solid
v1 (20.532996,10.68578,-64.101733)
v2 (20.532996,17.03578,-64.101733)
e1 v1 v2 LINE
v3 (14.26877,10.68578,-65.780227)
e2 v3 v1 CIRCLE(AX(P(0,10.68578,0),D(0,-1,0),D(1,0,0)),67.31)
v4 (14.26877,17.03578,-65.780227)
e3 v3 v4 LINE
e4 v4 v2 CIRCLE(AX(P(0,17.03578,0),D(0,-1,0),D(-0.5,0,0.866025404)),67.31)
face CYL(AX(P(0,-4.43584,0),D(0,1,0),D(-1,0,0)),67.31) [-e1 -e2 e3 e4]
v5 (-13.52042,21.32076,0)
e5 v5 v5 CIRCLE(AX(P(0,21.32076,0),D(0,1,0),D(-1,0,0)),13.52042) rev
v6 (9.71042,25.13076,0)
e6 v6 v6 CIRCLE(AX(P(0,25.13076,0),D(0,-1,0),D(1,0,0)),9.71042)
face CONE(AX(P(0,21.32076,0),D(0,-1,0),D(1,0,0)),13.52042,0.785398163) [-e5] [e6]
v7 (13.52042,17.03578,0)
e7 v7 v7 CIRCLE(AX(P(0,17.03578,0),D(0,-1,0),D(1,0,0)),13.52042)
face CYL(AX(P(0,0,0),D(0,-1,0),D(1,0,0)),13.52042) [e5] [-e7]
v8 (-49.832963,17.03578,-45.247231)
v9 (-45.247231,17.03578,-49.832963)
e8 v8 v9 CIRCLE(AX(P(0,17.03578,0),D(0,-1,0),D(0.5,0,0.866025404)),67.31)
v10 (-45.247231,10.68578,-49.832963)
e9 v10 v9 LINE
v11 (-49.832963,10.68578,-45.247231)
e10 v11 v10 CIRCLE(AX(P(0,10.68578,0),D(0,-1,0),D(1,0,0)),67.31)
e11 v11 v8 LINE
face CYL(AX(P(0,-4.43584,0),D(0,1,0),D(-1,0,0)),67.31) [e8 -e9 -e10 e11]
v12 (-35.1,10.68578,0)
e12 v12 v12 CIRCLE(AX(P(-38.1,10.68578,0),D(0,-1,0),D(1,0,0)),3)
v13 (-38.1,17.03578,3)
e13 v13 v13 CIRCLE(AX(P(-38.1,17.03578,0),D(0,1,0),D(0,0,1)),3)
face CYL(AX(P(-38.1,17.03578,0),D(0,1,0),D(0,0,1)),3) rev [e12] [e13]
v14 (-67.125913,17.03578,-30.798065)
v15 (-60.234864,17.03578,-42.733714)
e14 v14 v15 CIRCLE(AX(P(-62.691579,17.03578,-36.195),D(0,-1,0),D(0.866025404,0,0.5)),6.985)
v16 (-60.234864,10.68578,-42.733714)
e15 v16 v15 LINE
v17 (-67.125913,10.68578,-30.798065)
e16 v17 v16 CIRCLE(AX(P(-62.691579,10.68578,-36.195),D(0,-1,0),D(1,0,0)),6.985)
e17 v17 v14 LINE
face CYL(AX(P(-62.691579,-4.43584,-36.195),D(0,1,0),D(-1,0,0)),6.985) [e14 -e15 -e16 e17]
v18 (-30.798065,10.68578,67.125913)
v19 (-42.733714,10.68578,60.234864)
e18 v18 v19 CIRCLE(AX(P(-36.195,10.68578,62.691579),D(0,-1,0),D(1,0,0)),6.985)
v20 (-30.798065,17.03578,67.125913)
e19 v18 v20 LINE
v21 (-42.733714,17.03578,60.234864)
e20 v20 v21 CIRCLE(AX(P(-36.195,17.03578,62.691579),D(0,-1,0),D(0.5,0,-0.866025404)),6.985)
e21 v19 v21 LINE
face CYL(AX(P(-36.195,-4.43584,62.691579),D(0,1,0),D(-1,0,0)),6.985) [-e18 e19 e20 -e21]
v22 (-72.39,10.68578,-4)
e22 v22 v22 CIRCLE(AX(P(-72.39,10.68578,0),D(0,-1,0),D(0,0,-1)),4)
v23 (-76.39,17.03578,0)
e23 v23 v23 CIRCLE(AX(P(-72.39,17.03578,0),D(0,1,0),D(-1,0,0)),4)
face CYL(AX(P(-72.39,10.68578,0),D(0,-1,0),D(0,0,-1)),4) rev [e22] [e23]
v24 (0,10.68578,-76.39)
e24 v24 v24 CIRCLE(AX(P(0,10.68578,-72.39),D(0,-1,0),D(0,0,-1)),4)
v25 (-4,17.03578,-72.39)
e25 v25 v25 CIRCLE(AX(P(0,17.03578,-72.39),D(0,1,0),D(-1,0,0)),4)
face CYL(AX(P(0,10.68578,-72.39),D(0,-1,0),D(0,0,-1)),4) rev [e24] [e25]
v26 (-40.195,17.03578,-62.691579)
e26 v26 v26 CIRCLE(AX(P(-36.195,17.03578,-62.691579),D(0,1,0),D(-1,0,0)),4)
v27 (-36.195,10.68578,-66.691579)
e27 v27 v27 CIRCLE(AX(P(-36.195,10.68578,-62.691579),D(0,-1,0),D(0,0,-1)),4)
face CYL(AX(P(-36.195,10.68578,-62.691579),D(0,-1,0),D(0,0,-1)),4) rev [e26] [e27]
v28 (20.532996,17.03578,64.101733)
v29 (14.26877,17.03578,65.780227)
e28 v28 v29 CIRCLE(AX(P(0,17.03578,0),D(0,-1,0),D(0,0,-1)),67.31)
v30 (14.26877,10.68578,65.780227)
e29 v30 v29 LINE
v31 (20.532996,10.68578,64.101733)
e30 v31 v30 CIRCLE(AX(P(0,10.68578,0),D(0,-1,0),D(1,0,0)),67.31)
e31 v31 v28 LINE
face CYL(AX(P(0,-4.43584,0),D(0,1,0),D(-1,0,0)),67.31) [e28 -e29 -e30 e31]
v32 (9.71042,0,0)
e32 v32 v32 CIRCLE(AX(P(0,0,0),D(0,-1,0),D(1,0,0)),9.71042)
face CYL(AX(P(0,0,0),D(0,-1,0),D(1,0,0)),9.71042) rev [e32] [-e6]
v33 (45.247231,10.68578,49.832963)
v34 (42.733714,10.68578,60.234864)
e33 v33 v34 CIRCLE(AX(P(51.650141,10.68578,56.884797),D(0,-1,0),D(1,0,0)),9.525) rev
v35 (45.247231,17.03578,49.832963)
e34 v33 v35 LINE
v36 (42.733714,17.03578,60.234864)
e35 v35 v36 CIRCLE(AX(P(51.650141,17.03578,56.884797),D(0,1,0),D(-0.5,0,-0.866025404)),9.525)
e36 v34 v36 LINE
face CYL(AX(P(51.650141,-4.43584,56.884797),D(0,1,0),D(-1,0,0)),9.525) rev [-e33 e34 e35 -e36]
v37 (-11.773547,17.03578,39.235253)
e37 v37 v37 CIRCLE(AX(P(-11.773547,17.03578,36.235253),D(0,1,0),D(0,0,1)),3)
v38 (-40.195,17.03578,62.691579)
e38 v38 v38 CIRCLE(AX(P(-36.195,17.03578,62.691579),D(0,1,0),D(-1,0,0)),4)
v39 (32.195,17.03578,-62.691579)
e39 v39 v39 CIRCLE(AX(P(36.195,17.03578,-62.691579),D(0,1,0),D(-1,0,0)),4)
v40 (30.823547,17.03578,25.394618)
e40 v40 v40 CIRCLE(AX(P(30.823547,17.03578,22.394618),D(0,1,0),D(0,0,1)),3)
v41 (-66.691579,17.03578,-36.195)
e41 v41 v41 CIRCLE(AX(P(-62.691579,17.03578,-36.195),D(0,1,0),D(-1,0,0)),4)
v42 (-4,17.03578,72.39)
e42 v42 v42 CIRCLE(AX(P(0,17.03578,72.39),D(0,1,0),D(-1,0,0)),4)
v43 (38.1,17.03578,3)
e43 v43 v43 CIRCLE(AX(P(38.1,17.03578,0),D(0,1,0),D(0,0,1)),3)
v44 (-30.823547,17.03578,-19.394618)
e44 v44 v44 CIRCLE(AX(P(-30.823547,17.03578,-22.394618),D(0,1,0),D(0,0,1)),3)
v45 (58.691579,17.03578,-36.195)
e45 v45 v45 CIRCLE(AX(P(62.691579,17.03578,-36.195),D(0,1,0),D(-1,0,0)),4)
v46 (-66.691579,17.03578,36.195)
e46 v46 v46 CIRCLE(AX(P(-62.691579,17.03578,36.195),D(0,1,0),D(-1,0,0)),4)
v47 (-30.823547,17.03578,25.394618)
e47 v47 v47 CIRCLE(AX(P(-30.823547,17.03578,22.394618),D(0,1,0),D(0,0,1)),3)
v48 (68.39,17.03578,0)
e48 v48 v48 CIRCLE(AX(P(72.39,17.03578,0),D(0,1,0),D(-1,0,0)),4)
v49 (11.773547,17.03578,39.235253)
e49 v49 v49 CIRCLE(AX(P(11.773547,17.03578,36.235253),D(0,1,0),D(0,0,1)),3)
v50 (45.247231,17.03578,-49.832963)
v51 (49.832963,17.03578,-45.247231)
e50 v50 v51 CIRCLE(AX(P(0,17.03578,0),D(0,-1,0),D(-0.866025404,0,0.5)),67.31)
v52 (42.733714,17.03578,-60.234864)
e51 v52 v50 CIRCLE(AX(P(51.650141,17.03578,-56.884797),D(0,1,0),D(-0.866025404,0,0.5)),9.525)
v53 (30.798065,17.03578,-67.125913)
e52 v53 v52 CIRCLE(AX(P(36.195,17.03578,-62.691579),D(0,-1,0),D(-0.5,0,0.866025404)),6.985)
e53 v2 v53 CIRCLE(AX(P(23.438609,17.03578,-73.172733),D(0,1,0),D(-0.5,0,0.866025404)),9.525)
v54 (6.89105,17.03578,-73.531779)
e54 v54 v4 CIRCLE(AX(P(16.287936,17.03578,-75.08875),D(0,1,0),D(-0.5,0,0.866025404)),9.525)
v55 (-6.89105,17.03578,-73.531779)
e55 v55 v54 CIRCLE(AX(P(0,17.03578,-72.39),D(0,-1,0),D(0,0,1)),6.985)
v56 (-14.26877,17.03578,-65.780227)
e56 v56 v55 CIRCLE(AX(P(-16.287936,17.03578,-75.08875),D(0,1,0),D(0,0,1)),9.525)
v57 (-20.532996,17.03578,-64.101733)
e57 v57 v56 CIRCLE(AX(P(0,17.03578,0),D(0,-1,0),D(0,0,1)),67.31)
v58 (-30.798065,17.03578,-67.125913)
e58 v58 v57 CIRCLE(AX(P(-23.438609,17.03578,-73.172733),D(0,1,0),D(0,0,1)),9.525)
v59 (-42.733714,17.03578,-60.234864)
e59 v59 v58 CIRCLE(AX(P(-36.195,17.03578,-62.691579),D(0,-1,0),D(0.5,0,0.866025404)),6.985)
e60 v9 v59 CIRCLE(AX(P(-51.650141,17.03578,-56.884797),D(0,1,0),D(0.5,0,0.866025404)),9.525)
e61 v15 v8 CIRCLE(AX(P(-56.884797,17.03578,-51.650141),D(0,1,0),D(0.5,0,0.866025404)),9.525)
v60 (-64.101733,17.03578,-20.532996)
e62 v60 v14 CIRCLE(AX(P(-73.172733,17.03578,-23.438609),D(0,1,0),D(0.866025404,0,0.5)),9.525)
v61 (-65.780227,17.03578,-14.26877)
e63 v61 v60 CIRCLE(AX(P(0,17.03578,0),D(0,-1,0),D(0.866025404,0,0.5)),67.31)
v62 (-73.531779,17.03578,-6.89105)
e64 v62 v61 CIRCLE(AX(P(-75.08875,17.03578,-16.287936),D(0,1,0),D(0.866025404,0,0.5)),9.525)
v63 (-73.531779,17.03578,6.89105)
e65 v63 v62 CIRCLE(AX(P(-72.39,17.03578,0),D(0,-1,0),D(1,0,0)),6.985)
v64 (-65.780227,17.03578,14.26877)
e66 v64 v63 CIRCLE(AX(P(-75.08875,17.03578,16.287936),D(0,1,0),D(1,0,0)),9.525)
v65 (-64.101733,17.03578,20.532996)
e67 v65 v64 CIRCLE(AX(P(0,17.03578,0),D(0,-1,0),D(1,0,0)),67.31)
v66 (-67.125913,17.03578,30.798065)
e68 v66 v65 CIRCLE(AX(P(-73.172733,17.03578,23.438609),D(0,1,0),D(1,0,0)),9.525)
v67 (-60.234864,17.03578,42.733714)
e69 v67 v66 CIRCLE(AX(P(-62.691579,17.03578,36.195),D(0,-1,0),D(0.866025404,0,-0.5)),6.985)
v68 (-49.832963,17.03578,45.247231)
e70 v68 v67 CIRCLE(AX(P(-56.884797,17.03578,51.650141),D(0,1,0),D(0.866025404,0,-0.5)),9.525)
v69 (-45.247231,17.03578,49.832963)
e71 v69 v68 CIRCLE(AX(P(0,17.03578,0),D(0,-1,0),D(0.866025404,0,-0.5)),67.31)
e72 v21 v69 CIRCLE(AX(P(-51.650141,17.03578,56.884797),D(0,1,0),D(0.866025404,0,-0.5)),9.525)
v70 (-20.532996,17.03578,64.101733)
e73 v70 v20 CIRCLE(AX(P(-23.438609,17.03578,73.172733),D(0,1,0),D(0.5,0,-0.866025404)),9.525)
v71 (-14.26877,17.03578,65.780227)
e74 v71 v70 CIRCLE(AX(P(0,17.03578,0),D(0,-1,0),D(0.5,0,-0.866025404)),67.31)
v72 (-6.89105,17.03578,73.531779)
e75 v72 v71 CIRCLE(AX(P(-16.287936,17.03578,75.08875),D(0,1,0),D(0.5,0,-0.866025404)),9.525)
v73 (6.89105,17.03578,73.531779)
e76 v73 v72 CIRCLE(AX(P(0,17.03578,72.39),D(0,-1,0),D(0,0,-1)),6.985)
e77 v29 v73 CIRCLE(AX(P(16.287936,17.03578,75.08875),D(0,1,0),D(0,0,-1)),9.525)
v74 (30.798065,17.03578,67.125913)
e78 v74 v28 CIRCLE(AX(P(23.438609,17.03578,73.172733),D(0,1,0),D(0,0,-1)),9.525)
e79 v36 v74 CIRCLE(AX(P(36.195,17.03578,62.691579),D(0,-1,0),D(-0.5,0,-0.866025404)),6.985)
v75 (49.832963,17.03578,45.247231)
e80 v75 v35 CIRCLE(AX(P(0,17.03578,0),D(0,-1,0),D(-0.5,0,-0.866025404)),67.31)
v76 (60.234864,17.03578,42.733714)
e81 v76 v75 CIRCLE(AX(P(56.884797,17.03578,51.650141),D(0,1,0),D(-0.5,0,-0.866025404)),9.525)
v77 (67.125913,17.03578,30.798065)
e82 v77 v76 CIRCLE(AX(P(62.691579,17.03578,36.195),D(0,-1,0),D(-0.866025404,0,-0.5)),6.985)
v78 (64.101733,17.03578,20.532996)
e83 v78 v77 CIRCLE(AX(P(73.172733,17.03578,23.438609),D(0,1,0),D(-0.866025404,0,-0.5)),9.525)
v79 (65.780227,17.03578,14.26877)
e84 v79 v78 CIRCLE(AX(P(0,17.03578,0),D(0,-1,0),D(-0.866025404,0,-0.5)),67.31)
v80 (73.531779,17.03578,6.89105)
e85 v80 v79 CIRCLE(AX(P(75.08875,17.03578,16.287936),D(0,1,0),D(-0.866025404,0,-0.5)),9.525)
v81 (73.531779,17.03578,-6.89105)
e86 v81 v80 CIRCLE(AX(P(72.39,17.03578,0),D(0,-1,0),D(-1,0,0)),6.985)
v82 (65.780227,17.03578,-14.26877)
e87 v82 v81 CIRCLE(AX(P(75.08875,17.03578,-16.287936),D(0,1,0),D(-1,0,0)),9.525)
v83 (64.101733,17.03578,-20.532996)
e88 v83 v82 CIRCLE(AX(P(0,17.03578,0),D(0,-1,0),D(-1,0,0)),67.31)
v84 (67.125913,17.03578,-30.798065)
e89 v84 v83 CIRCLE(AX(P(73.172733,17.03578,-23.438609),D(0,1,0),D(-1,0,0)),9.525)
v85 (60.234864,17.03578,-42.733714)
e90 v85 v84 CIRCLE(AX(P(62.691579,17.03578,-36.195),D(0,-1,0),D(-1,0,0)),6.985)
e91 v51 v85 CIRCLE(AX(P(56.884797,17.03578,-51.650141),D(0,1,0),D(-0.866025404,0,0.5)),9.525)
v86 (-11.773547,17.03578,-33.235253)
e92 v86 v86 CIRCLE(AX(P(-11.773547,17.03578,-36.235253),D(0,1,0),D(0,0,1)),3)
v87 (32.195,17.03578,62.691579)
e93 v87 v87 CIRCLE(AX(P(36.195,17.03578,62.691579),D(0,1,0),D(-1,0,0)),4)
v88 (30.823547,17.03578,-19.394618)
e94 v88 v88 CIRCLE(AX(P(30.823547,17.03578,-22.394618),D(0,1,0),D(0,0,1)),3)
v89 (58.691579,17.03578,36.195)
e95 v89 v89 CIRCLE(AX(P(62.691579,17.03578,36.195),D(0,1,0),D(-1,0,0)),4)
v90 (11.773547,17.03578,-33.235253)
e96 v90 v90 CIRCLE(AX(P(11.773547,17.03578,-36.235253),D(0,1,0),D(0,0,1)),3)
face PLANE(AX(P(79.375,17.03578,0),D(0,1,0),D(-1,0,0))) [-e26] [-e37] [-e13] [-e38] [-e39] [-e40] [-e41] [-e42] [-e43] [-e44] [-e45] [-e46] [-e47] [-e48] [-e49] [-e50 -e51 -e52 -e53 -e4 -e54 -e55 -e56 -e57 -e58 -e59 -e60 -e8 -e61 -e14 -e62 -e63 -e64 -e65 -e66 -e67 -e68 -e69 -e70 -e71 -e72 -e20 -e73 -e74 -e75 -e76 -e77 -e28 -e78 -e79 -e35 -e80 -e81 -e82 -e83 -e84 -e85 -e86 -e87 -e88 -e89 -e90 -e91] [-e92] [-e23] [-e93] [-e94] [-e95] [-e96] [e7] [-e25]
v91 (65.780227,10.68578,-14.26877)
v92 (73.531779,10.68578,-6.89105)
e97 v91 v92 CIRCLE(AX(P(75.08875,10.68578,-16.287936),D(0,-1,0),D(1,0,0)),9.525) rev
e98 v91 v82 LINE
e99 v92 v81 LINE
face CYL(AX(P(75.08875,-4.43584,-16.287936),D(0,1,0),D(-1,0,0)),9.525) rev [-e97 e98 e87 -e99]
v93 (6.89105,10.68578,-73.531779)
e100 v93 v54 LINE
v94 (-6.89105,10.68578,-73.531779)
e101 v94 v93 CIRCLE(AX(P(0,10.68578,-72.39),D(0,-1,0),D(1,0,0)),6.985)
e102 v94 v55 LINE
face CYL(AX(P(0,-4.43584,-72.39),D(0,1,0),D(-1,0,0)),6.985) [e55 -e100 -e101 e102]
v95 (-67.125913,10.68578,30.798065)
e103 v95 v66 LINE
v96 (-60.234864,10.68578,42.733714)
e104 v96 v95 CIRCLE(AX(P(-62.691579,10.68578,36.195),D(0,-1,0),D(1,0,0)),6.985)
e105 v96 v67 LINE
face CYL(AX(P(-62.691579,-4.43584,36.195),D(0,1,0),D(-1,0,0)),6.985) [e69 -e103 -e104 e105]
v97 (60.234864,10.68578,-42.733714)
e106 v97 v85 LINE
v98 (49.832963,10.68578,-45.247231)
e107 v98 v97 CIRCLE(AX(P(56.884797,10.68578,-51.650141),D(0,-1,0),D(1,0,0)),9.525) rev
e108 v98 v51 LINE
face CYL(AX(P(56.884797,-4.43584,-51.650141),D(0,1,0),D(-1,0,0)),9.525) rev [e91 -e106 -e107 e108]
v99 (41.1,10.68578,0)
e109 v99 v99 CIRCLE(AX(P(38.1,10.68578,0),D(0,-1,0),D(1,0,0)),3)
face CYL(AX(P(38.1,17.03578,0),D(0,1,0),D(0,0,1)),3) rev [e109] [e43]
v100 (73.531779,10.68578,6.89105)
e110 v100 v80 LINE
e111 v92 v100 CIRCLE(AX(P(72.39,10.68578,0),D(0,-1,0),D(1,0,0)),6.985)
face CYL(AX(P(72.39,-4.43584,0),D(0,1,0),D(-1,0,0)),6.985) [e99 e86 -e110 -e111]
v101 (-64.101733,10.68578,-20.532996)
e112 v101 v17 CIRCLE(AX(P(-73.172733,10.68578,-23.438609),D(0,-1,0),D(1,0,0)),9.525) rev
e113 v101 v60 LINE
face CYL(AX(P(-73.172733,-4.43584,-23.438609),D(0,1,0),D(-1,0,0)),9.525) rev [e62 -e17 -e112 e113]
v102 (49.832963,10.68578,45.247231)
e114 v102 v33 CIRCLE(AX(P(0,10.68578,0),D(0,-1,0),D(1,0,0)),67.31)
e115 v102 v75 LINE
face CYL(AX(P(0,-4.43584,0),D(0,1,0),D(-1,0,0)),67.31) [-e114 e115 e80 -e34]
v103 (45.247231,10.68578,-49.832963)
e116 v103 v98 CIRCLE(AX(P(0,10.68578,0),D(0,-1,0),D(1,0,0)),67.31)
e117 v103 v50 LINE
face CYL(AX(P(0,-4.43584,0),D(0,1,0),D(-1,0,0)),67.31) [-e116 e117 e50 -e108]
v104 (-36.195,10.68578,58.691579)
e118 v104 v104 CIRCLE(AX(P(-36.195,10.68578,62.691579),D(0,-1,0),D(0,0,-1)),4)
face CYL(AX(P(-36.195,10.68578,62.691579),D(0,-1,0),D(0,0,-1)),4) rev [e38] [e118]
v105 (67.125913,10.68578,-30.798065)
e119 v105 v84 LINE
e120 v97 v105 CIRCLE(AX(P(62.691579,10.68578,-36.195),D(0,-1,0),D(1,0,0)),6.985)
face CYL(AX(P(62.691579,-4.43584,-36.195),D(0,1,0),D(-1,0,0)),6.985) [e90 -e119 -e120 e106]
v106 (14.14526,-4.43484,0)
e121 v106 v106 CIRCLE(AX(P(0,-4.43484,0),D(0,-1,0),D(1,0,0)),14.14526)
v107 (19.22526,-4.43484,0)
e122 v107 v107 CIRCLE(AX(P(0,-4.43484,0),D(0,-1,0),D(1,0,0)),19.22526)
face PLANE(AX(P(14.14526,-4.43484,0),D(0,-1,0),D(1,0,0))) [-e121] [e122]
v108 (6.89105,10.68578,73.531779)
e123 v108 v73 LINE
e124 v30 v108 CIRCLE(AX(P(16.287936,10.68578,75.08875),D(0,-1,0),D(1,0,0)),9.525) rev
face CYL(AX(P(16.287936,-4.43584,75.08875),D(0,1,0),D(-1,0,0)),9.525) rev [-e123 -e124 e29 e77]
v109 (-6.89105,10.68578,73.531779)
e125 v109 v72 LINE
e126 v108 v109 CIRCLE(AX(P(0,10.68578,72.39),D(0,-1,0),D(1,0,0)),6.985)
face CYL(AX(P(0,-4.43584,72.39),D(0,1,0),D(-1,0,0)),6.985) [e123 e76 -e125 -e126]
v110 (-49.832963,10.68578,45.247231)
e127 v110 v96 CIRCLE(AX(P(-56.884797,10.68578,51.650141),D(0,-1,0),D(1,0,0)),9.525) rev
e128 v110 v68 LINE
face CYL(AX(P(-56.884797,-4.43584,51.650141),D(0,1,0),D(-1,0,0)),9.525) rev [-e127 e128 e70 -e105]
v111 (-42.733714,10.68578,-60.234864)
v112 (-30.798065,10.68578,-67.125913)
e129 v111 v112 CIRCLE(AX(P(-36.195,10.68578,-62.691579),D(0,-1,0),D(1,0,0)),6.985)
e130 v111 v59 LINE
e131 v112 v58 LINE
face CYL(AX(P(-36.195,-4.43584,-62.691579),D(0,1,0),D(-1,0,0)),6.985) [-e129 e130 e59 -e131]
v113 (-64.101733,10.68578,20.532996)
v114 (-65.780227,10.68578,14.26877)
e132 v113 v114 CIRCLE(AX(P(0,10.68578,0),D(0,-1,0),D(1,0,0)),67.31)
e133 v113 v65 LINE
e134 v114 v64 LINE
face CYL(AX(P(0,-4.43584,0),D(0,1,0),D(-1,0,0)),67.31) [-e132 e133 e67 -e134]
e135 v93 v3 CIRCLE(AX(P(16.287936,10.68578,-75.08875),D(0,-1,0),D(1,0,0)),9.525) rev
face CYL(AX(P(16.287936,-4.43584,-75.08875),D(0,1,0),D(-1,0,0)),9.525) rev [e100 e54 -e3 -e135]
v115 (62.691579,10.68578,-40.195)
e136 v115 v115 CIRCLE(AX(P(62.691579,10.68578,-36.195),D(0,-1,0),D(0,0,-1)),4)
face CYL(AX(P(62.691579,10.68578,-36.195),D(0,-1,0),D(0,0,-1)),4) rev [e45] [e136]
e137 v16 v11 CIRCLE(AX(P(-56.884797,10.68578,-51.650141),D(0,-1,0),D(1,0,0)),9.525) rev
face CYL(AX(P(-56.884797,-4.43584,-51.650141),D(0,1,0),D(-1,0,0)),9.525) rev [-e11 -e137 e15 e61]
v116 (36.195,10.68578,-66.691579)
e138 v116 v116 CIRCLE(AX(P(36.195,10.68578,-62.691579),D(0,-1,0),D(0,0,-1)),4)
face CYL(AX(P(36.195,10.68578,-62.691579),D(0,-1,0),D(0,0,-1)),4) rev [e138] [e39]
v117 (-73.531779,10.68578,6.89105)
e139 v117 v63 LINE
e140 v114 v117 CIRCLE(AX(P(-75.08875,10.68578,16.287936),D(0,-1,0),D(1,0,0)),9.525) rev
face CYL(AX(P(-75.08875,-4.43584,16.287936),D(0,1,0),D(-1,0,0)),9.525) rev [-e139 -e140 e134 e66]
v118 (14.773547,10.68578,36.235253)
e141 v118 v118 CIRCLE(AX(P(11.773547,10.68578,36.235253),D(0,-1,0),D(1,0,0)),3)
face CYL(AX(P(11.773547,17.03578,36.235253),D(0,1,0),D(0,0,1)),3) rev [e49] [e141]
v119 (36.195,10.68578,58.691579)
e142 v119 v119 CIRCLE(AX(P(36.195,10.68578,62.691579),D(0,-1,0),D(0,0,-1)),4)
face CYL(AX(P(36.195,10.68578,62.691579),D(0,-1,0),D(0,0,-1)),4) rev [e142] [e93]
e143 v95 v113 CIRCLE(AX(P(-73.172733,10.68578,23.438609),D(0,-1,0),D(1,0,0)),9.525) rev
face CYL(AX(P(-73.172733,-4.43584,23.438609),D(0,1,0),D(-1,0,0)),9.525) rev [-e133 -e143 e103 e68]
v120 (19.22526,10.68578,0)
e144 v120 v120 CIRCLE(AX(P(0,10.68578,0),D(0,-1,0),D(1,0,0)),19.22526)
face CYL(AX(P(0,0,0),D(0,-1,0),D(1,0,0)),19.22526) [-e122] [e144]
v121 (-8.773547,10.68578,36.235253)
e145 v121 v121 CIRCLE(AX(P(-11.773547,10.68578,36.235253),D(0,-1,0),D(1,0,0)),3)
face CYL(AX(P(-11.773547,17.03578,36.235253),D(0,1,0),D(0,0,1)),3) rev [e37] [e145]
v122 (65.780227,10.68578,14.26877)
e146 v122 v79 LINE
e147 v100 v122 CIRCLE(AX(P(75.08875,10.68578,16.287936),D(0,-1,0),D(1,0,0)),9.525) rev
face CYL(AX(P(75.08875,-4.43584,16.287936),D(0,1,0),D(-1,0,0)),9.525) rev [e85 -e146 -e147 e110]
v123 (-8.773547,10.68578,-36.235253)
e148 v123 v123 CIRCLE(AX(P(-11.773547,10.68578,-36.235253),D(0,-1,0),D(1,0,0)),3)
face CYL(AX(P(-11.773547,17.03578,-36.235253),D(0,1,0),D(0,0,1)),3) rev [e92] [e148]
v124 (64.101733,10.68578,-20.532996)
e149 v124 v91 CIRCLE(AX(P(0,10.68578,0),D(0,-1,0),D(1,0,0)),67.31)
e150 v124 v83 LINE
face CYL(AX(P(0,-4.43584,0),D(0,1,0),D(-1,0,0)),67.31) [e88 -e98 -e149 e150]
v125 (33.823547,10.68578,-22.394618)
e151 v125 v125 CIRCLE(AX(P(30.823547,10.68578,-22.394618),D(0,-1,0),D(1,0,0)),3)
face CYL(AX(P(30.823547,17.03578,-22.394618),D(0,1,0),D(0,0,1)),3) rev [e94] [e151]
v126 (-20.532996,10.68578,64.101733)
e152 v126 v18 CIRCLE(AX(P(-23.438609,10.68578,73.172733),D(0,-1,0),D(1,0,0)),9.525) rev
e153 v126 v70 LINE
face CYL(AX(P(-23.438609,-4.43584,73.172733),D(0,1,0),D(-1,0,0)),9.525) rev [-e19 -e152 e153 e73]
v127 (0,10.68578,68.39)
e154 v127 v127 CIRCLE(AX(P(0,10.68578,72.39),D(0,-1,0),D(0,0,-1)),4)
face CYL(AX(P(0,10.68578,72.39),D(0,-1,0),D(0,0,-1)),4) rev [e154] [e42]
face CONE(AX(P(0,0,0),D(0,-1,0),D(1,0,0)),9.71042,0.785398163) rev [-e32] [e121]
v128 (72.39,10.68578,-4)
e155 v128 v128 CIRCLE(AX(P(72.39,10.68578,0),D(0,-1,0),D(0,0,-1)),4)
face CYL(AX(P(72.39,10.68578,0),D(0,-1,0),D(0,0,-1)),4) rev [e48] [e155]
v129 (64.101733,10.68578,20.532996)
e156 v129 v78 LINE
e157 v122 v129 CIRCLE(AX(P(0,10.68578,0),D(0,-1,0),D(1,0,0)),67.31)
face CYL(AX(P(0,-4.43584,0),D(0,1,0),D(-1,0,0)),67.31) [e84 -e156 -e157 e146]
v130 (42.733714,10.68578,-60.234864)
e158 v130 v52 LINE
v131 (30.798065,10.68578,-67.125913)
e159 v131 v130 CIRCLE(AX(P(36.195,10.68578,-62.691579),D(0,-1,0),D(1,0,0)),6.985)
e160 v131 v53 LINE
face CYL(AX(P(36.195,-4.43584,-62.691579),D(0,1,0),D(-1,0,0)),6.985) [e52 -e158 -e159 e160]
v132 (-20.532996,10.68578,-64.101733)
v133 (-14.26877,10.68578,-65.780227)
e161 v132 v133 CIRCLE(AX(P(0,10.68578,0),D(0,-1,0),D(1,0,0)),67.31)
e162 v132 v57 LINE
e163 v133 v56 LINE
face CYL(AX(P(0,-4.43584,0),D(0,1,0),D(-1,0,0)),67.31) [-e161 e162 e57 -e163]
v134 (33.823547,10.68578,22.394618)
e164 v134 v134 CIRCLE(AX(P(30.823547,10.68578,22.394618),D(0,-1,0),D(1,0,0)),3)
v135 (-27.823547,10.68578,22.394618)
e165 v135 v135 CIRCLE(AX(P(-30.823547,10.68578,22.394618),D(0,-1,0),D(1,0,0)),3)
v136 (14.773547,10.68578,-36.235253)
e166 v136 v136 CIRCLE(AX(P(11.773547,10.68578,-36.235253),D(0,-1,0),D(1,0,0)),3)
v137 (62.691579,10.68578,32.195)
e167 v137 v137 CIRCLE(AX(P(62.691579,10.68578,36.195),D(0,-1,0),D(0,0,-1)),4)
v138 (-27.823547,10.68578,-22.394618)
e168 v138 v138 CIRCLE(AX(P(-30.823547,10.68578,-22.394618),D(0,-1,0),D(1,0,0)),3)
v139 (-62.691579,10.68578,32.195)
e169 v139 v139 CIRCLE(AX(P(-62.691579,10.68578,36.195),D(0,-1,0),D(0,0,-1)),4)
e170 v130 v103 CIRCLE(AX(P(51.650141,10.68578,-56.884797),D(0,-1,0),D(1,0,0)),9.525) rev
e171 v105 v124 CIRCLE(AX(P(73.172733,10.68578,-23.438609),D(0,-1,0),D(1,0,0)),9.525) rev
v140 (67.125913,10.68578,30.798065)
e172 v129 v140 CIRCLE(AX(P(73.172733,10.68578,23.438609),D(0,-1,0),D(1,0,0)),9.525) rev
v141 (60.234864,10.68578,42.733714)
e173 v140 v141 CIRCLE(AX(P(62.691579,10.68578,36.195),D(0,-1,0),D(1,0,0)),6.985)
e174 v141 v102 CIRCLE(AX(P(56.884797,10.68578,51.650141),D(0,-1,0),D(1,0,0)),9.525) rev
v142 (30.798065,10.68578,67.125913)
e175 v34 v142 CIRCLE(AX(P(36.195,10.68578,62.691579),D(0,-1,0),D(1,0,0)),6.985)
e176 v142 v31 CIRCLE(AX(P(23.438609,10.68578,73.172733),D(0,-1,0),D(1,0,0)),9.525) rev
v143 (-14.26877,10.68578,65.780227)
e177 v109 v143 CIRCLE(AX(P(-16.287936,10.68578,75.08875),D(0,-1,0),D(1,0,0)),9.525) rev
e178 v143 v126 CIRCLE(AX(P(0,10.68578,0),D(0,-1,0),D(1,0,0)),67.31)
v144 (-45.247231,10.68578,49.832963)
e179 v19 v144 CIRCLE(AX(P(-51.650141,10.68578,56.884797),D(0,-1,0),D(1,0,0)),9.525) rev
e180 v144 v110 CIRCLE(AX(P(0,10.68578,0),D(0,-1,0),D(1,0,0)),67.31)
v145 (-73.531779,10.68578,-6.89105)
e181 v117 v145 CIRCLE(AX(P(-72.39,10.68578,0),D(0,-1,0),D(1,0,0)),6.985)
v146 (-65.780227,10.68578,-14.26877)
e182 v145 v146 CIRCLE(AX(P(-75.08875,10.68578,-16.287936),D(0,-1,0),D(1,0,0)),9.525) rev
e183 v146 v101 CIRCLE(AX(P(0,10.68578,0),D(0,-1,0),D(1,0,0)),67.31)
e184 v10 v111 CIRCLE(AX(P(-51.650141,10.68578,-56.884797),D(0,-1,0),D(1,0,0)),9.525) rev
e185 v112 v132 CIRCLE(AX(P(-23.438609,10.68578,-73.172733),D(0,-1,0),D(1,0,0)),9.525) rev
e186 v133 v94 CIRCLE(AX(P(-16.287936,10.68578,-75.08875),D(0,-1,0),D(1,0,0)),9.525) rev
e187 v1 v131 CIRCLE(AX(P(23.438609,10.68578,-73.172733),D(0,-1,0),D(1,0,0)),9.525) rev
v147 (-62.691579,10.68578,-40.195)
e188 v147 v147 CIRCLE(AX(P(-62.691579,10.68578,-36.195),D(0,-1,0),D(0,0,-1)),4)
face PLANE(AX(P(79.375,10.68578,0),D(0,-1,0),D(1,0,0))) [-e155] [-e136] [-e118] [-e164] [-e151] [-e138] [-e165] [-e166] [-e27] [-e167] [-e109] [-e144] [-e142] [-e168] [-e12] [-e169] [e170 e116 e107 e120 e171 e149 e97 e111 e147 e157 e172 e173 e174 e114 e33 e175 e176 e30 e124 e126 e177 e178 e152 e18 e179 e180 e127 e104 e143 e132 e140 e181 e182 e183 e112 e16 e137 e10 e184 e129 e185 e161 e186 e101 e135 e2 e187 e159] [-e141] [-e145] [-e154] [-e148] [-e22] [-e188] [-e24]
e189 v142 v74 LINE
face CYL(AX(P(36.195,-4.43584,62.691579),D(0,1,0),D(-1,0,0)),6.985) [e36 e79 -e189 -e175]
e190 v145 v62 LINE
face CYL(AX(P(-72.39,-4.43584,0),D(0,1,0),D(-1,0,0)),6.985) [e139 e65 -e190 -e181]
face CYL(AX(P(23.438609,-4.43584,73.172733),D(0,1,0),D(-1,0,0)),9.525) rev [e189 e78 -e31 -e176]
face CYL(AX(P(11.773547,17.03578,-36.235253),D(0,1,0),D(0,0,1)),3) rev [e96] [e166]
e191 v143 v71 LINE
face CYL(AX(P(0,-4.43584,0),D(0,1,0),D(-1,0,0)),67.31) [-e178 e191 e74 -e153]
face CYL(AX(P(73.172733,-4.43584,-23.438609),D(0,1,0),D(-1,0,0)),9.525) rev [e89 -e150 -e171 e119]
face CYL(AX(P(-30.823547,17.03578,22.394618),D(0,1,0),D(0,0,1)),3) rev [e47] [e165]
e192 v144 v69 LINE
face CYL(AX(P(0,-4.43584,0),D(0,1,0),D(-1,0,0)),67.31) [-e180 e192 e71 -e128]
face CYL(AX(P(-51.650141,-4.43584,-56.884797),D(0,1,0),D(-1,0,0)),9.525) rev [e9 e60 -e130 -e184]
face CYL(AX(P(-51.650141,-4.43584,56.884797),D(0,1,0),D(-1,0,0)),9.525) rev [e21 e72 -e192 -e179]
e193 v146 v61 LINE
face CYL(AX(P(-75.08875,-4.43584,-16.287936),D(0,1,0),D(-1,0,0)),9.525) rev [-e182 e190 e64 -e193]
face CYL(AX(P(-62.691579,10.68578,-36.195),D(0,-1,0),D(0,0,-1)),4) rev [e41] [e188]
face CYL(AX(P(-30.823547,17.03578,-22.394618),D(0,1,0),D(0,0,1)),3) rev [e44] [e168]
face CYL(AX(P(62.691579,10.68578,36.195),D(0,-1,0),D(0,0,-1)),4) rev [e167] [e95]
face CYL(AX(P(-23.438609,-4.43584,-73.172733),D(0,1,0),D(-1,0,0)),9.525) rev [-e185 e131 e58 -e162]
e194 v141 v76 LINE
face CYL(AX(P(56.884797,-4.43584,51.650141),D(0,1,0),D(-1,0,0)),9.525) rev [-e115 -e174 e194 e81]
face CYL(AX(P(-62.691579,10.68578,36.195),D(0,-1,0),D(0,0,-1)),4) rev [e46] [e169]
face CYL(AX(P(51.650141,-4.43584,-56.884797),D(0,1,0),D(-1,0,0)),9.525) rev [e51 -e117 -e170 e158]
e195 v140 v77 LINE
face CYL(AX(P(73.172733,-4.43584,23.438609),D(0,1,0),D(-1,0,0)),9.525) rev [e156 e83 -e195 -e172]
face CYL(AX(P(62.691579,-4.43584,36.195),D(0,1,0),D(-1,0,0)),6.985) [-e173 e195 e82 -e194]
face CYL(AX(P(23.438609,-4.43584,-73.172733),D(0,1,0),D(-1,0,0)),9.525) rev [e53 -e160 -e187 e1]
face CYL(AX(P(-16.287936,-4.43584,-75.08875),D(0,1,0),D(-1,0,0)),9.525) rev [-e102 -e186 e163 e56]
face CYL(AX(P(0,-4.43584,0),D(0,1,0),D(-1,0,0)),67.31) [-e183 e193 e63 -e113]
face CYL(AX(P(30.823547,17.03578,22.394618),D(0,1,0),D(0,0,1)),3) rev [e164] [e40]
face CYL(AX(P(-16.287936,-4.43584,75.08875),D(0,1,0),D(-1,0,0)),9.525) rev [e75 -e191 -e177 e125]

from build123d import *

# Parameters (mm, degrees)
CHAMFER1_SIZE      = 3.81
HOLE2_D            = 6
CIRPATTERN2_COUNT  = 10
HOLE4_D            = 8
CIRPATTERN4_COUNT  = 12
CUT_EXTRUDE3_REACH = 116.288
CIRPATTERN5_COUNT  = 12


with BuildPart() as part:
    # Sketch1 → Revolve1 (revolve)
    with BuildSketch(Plane.XY):
        Polygon((79.375, 10.68578), (79.375, 17.03578), (13.52042, 17.03578), (13.52042, 25.13076), (9.71042, 25.13076), (9.71042, 0), (14.14526, -4.43484), (19.22526, -4.43484), (19.22526, 10.68578), align=None)
    revolve(axis=Axis((0, 0, 0), (0, 1, 0)))

    # Chamfer1
    chamfer1_edges = [part.edges().sort_by_distance(p)[0] for p in [
        (-13.52042, 25.13076, 0),
    ]]
    chamfer(chamfer1_edges, length=CHAMFER1_SIZE - 0.0001)  # a hair under: the kernel refuses the full size

    # Hole2 (through all)
    with Locations(Plane(origin=(0, 17.03578, 0), x_dir=(1, 0, 0), z_dir=(0, 1, 0))):
        with Locations((38.1, 0)):
            hole2 = Hole(HOLE2_D / 2)

    # CirPattern2: Hole2 ×10 about axis
    cirpattern2_axis = Axis((0, 0, 0), (0, 1, 0))
    for i in range(1, CIRPATTERN2_COUNT):
        add(hole2.rotate(cirpattern2_axis, i * 360 / CIRPATTERN2_COUNT), mode=Mode.SUBTRACT)

    # Hole4 (through all)
    with Locations(Plane.XZ.offset(-10.68578)):
        with Locations((72.39, 0)):
            hole4 = Hole(HOLE4_D / 2)

    # CirPattern4: Hole4 ×12 about axis
    cirpattern4_axis = Axis((0, 0, 0), (0, 1, 0))
    for i in range(1, CIRPATTERN4_COUNT):
        add(hole4.rotate(cirpattern4_axis, i * 360 / CIRPATTERN4_COUNT), mode=Mode.SUBTRACT)

    # Sketch17 → Cut-Extrude3 (cut, up to next)
    with BuildSketch(Plane(origin=(0, 17.03578, 0), x_dir=(1, 0, 0), z_dir=(0, 1, 0)), mode=Mode.PRIVATE) as cut_extrude3_sk1:
        with BuildLine():
            ThreePointArc((79.375, 0), (77.717548697, 4.517460557), (73.531778846, 6.891049707))
            ThreePointArc((73.531778846, 6.891049707), (68.521982999, 9.388428721), (65.780227273, 14.268770092))
            ThreePointArc((65.780227273, 14.268770092), (65.016467368, 17.421109926), (64.101732931, 20.532996256))
            ThreePointArc((64.101732931, 20.532996256), (64.035992356, 26.130373726), (67.12591332, 30.798065318))
            ThreePointArc((67.12591332, 30.798065318), (69.56410177, 34.946538746), (68.740766425, 39.6875))
            ThreePointArc((68.740766425, 39.6875), (76.670362462, 20.543761705), (79.375, 0))
        make_face()
    cut_extrude3_tool1 = extrude(cut_extrude3_sk1.sketch, amount=-CUT_EXTRUDE3_REACH, mode=Mode.PRIVATE) & part.part
    cut_extrude3 = cut_extrude3_tool1.solids().sort_by_distance((71.346501, 17.03578, -19.117237))[0]
    add(cut_extrude3, mode=Mode.SUBTRACT)

    # CirPattern5: Cut-Extrude3 ×12 about axis
    cirpattern5_axis = Axis((0, 0, 0), (0, 1, 0))
    for i in range(1, CIRPATTERN5_COUNT):
        add(cut_extrude3.rotate(cirpattern5_axis, i * 360 / CIRPATTERN5_COUNT), mode=Mode.SUBTRACT)


solid = part.part
